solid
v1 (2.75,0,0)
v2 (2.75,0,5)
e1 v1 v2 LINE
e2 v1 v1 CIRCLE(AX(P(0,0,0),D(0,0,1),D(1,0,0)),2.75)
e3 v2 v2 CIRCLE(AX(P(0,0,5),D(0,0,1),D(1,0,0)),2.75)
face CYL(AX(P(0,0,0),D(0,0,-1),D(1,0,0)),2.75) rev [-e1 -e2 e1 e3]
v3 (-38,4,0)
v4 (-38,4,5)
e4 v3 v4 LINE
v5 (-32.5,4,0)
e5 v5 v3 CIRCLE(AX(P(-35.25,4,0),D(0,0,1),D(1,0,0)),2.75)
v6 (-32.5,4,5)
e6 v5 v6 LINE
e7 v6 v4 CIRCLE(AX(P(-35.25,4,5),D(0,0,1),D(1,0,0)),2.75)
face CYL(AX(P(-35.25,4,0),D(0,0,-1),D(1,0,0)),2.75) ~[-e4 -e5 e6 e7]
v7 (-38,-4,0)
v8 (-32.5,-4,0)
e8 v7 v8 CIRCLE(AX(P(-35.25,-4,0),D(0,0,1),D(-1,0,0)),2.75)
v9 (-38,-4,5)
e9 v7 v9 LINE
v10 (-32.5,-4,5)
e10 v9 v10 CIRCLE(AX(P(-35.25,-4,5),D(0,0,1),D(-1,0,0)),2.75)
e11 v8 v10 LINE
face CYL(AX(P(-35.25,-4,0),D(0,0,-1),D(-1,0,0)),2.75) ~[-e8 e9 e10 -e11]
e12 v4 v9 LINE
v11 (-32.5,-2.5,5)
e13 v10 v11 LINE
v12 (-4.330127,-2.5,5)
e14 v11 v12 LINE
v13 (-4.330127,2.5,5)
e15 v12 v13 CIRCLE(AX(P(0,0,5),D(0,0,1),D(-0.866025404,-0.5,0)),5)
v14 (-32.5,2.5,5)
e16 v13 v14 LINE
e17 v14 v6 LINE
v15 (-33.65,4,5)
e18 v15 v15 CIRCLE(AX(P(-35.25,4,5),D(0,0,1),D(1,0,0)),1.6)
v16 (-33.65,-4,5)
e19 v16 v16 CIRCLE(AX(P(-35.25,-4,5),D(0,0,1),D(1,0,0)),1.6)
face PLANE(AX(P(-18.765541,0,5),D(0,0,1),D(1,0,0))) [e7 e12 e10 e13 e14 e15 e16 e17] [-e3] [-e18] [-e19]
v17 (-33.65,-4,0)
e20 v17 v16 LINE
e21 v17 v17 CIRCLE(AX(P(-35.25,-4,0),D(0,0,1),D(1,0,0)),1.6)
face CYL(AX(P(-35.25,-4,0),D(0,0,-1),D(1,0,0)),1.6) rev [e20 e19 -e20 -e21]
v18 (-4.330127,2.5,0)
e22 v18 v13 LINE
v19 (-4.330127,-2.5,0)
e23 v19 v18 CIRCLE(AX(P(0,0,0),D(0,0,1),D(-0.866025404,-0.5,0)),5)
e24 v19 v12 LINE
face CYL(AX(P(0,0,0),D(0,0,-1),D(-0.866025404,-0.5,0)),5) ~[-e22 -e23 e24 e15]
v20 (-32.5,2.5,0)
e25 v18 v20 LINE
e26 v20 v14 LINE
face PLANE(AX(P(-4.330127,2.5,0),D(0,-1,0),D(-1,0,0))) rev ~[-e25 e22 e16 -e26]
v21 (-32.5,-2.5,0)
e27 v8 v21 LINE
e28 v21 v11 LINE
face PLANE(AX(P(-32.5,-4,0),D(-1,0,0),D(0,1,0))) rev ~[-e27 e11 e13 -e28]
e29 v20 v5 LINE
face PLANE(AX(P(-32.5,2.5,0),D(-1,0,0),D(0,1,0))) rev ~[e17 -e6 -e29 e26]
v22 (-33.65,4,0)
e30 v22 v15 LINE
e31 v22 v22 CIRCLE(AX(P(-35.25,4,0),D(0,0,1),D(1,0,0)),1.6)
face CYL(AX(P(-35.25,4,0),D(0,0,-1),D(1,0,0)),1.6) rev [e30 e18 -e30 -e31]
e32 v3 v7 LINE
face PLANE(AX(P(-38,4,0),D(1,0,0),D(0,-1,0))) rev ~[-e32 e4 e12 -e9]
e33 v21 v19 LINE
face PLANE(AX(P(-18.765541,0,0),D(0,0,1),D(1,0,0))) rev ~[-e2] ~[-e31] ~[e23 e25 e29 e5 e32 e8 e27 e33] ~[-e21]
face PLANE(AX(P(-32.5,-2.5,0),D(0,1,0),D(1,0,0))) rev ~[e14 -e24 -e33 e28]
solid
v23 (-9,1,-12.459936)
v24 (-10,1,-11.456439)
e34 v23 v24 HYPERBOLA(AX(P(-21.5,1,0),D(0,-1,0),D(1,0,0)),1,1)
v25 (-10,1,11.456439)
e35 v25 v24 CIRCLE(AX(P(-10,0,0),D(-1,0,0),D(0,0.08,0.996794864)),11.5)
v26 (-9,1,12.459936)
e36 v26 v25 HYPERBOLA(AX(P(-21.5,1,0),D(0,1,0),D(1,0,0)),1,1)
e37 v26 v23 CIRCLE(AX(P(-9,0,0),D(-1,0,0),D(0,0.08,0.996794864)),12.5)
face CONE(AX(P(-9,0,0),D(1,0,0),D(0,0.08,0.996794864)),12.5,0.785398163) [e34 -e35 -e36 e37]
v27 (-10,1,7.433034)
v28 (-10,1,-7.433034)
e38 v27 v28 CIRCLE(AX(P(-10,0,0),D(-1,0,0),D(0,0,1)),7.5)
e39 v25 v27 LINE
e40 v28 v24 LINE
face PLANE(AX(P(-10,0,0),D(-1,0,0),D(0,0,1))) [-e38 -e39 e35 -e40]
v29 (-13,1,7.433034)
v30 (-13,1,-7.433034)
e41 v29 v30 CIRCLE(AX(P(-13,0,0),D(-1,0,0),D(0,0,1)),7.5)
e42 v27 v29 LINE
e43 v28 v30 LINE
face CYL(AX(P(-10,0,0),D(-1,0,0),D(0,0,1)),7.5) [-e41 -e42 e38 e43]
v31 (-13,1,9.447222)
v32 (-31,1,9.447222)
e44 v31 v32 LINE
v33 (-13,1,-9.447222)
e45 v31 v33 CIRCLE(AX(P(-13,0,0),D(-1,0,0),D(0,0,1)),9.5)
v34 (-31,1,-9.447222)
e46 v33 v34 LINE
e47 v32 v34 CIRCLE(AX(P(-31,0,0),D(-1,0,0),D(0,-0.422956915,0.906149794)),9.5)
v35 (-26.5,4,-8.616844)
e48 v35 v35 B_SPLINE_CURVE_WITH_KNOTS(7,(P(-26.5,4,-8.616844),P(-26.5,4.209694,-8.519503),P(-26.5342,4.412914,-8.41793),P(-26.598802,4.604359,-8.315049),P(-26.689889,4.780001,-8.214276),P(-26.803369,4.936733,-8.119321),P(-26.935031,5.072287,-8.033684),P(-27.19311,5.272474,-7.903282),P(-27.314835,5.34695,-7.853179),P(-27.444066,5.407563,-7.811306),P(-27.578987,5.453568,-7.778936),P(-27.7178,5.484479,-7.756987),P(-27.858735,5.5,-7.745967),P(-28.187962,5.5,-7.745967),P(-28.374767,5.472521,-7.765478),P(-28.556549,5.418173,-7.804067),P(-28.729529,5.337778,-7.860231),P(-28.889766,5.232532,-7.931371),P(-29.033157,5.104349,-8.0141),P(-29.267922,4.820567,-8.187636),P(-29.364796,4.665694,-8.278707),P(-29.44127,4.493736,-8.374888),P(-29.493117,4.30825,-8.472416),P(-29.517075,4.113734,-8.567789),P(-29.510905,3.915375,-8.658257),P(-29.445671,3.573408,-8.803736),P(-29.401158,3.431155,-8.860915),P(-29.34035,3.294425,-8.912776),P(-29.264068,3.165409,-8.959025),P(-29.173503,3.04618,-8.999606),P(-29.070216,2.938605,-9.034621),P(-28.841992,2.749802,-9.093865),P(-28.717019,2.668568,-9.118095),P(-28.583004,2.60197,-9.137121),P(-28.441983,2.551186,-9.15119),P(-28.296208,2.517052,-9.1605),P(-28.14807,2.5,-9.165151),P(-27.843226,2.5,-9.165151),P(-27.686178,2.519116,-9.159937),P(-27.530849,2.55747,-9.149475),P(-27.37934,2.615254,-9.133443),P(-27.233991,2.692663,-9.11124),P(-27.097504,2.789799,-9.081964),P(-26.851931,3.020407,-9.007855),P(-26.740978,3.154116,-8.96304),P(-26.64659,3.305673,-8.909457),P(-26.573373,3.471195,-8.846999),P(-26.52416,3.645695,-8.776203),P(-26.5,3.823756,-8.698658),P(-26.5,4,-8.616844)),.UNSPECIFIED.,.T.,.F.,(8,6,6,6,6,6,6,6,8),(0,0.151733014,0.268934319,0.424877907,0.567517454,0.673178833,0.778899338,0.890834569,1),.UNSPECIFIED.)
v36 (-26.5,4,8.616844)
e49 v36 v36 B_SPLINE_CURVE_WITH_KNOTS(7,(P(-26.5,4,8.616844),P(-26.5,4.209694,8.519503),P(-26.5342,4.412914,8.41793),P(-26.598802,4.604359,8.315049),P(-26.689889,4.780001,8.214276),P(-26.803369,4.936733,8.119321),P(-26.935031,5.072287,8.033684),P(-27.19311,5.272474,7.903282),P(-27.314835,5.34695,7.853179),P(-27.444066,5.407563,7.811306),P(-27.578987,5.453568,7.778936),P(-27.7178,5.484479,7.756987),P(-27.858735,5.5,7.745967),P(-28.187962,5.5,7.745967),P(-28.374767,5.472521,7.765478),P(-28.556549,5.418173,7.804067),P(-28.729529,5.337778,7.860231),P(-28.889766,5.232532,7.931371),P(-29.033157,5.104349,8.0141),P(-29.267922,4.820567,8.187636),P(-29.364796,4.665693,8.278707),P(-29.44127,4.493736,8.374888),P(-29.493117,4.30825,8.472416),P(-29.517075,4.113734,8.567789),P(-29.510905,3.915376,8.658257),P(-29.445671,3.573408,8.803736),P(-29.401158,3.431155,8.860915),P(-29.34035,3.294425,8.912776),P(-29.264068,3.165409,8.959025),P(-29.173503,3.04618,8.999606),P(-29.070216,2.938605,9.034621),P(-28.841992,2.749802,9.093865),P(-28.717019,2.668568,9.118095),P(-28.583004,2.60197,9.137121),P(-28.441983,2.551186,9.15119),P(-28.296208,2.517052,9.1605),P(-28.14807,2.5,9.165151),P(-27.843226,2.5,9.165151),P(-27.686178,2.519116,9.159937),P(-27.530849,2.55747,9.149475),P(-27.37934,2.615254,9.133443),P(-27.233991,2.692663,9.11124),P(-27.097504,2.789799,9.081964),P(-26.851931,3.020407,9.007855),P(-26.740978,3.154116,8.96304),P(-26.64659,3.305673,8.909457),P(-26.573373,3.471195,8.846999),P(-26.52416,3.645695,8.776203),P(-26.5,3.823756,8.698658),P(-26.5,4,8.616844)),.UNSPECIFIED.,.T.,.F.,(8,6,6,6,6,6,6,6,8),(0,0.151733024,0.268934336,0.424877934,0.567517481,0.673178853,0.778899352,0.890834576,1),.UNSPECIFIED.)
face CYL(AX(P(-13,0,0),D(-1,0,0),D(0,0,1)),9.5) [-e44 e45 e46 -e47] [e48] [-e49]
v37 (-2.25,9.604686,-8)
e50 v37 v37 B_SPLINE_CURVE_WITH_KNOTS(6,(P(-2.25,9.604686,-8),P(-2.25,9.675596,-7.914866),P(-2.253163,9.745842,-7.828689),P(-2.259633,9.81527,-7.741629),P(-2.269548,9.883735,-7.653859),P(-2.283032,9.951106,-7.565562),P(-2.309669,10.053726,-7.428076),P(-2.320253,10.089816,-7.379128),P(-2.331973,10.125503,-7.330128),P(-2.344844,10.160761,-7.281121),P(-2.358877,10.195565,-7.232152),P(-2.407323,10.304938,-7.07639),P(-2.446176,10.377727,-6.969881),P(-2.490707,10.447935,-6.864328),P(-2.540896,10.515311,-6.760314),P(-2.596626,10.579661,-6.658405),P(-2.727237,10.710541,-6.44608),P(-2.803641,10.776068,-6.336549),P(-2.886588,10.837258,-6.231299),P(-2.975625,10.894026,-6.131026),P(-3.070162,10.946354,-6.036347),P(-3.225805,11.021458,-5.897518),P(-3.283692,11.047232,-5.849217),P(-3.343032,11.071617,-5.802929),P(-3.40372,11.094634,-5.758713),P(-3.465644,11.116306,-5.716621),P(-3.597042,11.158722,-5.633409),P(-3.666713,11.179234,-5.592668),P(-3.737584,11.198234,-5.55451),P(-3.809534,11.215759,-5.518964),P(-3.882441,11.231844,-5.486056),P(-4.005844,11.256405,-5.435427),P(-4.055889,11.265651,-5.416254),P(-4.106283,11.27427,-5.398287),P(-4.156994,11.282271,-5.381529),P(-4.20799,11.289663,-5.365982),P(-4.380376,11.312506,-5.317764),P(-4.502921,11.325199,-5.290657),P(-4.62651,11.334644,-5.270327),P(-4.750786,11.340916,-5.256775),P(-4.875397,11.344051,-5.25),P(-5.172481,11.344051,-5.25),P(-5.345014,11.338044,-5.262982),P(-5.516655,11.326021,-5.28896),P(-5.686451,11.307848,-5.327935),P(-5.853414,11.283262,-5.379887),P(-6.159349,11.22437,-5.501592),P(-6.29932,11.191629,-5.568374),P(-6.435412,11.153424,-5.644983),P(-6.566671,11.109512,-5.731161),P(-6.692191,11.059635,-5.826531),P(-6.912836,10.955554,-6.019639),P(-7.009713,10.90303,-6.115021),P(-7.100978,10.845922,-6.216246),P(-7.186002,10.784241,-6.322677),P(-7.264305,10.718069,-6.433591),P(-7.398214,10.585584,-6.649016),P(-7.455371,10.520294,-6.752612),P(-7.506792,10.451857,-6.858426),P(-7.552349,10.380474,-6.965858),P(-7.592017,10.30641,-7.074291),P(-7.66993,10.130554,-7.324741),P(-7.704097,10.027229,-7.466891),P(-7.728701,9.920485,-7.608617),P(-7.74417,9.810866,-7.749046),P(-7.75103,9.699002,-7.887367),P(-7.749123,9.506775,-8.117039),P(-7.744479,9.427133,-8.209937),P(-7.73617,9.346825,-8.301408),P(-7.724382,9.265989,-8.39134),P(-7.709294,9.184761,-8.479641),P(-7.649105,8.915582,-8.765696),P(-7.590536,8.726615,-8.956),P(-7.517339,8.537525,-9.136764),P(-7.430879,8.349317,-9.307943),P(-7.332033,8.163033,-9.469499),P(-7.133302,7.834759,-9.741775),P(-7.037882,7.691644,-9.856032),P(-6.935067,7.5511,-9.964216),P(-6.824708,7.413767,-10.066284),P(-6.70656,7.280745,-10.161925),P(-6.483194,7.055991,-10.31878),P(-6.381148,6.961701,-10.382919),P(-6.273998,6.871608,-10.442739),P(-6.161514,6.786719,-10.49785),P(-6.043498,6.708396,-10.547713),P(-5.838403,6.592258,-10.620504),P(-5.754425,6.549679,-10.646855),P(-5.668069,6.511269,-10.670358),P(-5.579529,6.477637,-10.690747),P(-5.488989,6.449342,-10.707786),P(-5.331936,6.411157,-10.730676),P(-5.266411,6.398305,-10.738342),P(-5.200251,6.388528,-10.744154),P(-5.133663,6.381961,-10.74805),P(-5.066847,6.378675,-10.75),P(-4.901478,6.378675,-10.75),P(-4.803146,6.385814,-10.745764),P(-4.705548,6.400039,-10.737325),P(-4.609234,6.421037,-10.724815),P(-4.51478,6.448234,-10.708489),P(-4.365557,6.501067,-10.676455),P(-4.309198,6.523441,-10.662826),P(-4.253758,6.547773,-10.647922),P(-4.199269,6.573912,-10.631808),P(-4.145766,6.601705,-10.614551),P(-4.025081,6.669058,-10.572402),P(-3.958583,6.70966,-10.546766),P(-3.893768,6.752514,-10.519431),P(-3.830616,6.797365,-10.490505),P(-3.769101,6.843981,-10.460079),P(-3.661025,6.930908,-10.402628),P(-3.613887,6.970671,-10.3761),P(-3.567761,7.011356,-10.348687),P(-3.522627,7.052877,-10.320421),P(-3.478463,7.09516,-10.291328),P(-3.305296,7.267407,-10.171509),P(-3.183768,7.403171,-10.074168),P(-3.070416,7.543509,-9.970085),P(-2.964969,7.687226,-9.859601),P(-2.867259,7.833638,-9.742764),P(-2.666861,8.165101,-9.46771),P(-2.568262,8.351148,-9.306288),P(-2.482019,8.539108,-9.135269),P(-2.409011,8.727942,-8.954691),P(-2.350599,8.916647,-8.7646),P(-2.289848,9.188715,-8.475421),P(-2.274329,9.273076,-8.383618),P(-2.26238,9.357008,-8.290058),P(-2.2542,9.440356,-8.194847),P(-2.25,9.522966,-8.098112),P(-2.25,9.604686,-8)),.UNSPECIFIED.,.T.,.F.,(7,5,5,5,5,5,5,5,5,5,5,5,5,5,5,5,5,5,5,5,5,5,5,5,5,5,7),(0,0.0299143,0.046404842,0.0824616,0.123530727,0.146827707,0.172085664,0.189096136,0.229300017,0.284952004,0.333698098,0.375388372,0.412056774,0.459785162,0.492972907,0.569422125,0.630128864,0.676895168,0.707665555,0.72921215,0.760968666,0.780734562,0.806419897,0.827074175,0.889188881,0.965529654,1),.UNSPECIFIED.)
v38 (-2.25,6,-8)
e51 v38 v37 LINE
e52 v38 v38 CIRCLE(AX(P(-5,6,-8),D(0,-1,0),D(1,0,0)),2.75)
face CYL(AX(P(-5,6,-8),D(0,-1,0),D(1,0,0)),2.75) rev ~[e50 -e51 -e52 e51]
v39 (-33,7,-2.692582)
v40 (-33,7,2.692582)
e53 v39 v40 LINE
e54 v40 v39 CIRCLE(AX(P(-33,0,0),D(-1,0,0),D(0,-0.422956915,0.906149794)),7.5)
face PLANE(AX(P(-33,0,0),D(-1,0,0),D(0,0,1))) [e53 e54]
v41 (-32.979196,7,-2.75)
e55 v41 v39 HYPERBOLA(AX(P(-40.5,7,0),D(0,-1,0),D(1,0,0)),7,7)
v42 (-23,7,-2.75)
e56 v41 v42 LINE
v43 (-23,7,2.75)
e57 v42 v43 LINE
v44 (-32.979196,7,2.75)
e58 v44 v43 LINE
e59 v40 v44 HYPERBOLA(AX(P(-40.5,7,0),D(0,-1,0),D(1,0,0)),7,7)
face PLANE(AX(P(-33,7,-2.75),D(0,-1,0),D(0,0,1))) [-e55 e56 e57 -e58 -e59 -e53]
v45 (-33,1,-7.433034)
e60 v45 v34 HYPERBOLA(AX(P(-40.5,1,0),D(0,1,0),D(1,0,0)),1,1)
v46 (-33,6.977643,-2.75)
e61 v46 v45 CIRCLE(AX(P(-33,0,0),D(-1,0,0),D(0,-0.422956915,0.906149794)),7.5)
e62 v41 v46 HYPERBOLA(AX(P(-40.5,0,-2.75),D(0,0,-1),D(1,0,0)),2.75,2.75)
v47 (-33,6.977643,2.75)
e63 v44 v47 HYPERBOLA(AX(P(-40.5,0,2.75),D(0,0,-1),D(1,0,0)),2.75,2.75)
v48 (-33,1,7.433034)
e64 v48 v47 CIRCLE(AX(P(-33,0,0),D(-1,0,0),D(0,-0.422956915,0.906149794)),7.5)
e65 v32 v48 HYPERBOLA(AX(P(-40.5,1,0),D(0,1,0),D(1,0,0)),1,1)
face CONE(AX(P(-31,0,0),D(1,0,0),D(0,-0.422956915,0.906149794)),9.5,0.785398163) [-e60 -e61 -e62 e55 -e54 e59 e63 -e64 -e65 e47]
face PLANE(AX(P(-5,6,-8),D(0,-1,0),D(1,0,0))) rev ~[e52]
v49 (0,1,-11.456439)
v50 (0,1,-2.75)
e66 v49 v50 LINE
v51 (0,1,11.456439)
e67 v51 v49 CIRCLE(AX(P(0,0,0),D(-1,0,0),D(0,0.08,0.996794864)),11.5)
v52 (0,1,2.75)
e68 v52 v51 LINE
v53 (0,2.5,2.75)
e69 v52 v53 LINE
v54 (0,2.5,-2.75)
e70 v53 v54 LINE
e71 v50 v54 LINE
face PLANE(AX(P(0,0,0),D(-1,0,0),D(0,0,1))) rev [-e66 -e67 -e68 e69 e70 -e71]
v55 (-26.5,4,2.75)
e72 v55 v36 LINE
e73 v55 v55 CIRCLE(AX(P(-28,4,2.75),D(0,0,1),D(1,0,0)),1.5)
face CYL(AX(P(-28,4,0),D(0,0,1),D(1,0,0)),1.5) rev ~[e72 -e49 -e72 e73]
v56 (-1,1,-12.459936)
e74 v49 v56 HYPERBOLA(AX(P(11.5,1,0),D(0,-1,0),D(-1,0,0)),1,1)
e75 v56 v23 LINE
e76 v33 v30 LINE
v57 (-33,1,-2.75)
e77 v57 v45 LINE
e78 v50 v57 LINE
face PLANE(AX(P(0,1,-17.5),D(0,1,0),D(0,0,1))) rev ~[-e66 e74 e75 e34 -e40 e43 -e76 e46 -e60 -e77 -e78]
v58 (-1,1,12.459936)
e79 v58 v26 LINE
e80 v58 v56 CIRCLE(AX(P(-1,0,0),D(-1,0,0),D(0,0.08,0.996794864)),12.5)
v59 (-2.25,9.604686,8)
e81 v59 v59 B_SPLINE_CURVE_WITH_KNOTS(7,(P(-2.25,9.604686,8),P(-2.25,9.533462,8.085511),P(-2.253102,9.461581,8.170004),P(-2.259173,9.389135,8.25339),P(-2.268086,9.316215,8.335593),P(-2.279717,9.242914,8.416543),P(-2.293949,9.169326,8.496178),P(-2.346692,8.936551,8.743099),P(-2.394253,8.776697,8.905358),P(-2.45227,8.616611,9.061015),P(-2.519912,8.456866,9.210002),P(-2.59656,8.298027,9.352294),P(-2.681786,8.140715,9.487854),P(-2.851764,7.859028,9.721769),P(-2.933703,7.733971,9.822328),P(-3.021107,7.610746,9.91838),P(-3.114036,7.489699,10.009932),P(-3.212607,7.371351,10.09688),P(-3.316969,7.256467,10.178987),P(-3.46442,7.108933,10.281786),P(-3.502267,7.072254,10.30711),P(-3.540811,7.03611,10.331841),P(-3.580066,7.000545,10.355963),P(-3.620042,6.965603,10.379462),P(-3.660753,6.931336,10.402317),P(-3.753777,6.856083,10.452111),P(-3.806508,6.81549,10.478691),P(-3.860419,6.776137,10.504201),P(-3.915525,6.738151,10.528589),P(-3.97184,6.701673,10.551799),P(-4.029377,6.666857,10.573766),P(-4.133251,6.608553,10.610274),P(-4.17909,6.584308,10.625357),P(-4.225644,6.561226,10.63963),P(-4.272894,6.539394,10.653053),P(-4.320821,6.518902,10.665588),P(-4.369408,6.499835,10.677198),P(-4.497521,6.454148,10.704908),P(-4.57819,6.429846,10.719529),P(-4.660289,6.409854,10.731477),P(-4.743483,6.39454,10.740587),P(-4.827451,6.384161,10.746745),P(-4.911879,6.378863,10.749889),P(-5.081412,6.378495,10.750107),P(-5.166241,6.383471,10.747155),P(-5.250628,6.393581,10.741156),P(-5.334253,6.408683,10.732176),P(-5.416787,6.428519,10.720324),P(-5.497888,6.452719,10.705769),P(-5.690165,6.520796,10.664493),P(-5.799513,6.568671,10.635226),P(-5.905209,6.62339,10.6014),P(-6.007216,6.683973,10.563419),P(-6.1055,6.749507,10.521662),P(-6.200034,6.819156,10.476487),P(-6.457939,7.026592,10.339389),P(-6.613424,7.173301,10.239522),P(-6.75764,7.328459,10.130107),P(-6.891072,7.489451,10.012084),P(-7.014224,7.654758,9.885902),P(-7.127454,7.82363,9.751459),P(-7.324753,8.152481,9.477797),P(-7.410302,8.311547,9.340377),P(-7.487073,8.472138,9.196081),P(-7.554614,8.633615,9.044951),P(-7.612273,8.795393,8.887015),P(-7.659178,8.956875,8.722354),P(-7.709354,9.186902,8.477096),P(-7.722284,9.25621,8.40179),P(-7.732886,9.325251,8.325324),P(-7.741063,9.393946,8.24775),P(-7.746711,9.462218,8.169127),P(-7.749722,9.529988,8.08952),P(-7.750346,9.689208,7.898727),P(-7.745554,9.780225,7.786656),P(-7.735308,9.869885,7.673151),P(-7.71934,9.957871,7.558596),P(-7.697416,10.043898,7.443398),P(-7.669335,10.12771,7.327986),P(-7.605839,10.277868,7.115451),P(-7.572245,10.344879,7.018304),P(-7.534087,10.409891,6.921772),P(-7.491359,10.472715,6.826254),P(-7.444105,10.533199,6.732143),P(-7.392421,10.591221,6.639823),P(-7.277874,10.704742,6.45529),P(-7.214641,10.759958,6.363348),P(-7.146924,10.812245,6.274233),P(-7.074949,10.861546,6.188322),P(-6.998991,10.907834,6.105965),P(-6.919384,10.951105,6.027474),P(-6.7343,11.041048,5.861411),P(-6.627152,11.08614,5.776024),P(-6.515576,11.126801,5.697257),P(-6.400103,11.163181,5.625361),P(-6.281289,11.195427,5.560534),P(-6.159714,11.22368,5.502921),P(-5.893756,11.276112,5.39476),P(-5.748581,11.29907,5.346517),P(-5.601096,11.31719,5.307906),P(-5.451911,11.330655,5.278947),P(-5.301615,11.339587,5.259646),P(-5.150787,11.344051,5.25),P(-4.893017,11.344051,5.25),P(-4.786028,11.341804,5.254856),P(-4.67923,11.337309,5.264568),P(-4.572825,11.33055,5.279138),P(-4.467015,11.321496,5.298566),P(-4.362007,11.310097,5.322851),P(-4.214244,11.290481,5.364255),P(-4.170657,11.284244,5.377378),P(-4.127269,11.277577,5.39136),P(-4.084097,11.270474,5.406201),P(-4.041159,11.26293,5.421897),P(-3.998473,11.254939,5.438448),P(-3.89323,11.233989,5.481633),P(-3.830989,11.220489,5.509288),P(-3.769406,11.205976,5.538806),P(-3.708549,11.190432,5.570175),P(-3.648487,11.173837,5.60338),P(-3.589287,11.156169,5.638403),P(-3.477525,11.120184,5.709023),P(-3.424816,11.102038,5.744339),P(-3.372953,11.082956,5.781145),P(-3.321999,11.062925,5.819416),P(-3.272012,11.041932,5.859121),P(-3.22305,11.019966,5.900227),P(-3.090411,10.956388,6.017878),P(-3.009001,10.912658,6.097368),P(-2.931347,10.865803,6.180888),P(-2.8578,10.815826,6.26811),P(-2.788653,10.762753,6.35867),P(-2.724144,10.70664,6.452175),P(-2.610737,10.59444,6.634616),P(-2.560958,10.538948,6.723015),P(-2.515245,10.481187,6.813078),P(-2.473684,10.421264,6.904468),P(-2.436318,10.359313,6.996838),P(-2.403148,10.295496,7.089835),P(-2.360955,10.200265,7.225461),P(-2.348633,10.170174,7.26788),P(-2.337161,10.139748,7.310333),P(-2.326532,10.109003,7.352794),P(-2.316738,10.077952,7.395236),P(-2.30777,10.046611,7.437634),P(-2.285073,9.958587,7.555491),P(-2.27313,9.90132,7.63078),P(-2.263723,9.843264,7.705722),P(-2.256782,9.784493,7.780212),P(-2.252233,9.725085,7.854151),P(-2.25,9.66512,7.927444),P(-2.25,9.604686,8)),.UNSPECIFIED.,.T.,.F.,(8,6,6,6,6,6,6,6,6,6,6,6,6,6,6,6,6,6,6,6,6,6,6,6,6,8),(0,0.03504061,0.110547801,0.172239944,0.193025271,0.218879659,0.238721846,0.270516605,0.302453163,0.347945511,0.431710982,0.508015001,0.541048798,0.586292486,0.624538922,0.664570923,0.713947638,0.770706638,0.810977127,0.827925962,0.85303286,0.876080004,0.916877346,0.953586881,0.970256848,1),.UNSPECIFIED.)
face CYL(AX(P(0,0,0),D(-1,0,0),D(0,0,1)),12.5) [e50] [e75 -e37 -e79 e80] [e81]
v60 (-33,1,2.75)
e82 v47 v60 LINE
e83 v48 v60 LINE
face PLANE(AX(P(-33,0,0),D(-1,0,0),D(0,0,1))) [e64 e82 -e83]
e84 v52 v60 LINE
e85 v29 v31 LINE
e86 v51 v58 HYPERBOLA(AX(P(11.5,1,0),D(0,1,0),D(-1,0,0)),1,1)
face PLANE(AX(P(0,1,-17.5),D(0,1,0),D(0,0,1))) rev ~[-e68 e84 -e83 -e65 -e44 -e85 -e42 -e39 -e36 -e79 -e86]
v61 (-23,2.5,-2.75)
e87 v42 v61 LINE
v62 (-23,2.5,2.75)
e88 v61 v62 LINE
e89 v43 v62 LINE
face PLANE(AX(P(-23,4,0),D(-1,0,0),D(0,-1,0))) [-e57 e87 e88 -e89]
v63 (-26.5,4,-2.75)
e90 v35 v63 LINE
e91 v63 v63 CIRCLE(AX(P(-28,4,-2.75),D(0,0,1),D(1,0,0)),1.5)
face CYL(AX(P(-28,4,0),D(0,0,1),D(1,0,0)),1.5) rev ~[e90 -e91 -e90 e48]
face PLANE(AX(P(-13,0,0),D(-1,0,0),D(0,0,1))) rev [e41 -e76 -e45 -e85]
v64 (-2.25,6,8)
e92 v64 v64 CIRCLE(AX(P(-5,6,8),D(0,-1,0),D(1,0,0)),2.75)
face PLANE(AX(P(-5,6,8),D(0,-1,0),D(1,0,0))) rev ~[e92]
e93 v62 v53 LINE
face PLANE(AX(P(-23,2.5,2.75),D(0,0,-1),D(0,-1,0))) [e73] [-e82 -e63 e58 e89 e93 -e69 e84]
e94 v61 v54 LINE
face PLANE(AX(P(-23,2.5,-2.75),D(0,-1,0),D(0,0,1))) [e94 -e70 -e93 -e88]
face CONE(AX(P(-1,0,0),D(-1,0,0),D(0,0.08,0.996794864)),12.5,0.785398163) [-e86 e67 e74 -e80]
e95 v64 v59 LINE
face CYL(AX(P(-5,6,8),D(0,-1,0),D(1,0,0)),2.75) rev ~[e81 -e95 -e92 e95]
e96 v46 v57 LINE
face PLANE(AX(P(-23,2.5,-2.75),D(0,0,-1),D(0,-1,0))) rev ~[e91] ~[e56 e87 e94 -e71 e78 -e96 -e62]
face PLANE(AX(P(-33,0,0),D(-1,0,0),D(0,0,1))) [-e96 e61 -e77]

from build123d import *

# Parameters (mm, degrees)
F1_ANGLE    = 180
F3_DEPTH    = 33.001
F4_W        = 6
F4_H        = 5.5
F5_DEPTH    = 10
F6_W        = 1.5
F6_H        = 5.5
F7_DEPTH    = 23.001
F8_T2_ANGLE = 230.0428222626
F9_R        = 1.5
F10_DEPTH   = 12.5
F11_R       = 1.6
F11_R_2     = 2.75
F12_DEPTH   = 5
F13_SIZE    = 1
F15_R       = 2.75
F16_DEPTH   = 5.3450514045


# Not quite as in the source:
# - a fillet or chamfer that OpenCascade refuses, or shapes differently, is made with other operations: its cross-section is extruded or revolved along the edge and cut away or added


with BuildPart() as f1:
    # F0 (on Front) → F1 (revolve)
    with BuildSketch(Plane.XZ):
        Polygon((-33, 0), (0, 0), (0, 12.5), (-10, 12.5), (-10, 7.5), (-13, 7.5), (-13, 9.5), (-33, 9.5), align=None)
    revolve(axis=Axis((-16.5, 0, 0), (-1, 0, 0)), revolution_arc=F1_ANGLE)

    # F2 (on face) → F3 (cut, through all)
    with BuildSketch(Plane.YZ):
        with BuildLine():
            ThreePointArc((1, 12.4599357944), (0.5004011242, 12.4899799325), (0, 12.5))
            Line((0, 12.5), (0, -12.5))
            ThreePointArc((0, -12.5), (0.5004011242, -12.4899799325), (1, -12.4599357944))
            Line((1, -12.4599357944), (1, 12.4599357944))
        make_face()
        with BuildLine():
            ThreePointArc((1, -12.4599357944), (0.5004011242, -12.4899799325), (0, -12.5))
            Line((0, -12.5), (0, -17.5))
            Line((0, -17.5), (1, -17.5))
            Line((1, -17.5), (1, -12.4599357944))
        make_face()
    extrude(amount=-F3_DEPTH, mode=Mode.SUBTRACT)

    # F4 (on face) → F5 (cut)
    with BuildSketch(Plane(origin=(-33, 0, 0), x_dir=(0, -1, 0), z_dir=(-1, 0, 0))):
        with Locations((-4, 0)):
            Rectangle(F4_W, F4_H)
    extrude(amount=-F5_DEPTH, mode=Mode.SUBTRACT)

    # F6 (on face) → F7 (cut, through all)
    with BuildSketch(Plane(origin=(-23, 0, 0), x_dir=(0, -1, 0), z_dir=(-1, 0, 0))):
        with Locations((-1.75, 0)):
            Rectangle(F6_W, F6_H)
    extrude(amount=-F7_DEPTH, mode=Mode.SUBTRACT)

    # F8: chamfer of 2 on 1 edges, made by hand

    # F8_s1 → F8_t2 (revolve, cut)
    with BuildSketch(Plane(origin=(0, 0, 0), x_dir=(1, 0, 0), z_dir=(0, -0.9061497935, -0.4229569147))):
        Polygon((-31, 9.5), (-33, 7.5), (-33, 9.5), align=None)
    revolve(axis=Axis((-33, 0, 0), (-1, 0, 0)), revolution_arc=F8_T2_ANGLE, mode=Mode.SUBTRACT)

    # F9 (on Top) → F10 (cut, symmetric)
    with BuildSketch(Plane.XY):
        with Locations((-28, 4)):
            Circle(F9_R)
    extrude(amount=F10_DEPTH, both=True, mode=Mode.SUBTRACT)

    # F13
    f13_edges = [f1.edges().sort_by_distance(p)[0] for p in [
        (-10, 12.5, 0),
        (0, 12.5, 0),
    ]]
    chamfer(f13_edges, length=F13_SIZE)

    # F15 (on offset) → F16 (cut, through all)
    with BuildSketch(Plane.XZ.offset(-6)):
        with Locations((-5, -8)):
            Circle(F15_R)
        with Locations((-5, 8)):
            Circle(F15_R)
    extrude(amount=-F16_DEPTH, mode=Mode.SUBTRACT)


with BuildPart() as f12:
    # F11 (on Top) → F12 (new body)
    with BuildSketch(Plane.XY):
        with BuildLine():
            Line((-32.5, -2.5), (-4.3301270189, -2.5))
            ThreePointArc((-4.3301270189, -2.5), (5, 0), (-4.3301270189, 2.5))
            Line((-4.3301270189, 2.5), (-32.5, 2.5))
            Line((-32.5, 2.5), (-32.5, 4))
            ThreePointArc((-32.5, 4), (-35.25, 6.75), (-38, 4))
            Line((-38, 4), (-38, -4))
            ThreePointArc((-38, -4), (-35.25, -6.75), (-32.5, -4))
            Line((-32.5, -4), (-32.5, -2.5))
        make_face()
        with Locations((-35.25, -4)):
            Circle(F11_R, mode=Mode.SUBTRACT)
        with Locations((-35.25, 4)):
            Circle(F11_R, mode=Mode.SUBTRACT)
        Circle(F11_R_2, mode=Mode.SUBTRACT)
    extrude(amount=F12_DEPTH)


solid = Compound([f1.part, f12.part])
